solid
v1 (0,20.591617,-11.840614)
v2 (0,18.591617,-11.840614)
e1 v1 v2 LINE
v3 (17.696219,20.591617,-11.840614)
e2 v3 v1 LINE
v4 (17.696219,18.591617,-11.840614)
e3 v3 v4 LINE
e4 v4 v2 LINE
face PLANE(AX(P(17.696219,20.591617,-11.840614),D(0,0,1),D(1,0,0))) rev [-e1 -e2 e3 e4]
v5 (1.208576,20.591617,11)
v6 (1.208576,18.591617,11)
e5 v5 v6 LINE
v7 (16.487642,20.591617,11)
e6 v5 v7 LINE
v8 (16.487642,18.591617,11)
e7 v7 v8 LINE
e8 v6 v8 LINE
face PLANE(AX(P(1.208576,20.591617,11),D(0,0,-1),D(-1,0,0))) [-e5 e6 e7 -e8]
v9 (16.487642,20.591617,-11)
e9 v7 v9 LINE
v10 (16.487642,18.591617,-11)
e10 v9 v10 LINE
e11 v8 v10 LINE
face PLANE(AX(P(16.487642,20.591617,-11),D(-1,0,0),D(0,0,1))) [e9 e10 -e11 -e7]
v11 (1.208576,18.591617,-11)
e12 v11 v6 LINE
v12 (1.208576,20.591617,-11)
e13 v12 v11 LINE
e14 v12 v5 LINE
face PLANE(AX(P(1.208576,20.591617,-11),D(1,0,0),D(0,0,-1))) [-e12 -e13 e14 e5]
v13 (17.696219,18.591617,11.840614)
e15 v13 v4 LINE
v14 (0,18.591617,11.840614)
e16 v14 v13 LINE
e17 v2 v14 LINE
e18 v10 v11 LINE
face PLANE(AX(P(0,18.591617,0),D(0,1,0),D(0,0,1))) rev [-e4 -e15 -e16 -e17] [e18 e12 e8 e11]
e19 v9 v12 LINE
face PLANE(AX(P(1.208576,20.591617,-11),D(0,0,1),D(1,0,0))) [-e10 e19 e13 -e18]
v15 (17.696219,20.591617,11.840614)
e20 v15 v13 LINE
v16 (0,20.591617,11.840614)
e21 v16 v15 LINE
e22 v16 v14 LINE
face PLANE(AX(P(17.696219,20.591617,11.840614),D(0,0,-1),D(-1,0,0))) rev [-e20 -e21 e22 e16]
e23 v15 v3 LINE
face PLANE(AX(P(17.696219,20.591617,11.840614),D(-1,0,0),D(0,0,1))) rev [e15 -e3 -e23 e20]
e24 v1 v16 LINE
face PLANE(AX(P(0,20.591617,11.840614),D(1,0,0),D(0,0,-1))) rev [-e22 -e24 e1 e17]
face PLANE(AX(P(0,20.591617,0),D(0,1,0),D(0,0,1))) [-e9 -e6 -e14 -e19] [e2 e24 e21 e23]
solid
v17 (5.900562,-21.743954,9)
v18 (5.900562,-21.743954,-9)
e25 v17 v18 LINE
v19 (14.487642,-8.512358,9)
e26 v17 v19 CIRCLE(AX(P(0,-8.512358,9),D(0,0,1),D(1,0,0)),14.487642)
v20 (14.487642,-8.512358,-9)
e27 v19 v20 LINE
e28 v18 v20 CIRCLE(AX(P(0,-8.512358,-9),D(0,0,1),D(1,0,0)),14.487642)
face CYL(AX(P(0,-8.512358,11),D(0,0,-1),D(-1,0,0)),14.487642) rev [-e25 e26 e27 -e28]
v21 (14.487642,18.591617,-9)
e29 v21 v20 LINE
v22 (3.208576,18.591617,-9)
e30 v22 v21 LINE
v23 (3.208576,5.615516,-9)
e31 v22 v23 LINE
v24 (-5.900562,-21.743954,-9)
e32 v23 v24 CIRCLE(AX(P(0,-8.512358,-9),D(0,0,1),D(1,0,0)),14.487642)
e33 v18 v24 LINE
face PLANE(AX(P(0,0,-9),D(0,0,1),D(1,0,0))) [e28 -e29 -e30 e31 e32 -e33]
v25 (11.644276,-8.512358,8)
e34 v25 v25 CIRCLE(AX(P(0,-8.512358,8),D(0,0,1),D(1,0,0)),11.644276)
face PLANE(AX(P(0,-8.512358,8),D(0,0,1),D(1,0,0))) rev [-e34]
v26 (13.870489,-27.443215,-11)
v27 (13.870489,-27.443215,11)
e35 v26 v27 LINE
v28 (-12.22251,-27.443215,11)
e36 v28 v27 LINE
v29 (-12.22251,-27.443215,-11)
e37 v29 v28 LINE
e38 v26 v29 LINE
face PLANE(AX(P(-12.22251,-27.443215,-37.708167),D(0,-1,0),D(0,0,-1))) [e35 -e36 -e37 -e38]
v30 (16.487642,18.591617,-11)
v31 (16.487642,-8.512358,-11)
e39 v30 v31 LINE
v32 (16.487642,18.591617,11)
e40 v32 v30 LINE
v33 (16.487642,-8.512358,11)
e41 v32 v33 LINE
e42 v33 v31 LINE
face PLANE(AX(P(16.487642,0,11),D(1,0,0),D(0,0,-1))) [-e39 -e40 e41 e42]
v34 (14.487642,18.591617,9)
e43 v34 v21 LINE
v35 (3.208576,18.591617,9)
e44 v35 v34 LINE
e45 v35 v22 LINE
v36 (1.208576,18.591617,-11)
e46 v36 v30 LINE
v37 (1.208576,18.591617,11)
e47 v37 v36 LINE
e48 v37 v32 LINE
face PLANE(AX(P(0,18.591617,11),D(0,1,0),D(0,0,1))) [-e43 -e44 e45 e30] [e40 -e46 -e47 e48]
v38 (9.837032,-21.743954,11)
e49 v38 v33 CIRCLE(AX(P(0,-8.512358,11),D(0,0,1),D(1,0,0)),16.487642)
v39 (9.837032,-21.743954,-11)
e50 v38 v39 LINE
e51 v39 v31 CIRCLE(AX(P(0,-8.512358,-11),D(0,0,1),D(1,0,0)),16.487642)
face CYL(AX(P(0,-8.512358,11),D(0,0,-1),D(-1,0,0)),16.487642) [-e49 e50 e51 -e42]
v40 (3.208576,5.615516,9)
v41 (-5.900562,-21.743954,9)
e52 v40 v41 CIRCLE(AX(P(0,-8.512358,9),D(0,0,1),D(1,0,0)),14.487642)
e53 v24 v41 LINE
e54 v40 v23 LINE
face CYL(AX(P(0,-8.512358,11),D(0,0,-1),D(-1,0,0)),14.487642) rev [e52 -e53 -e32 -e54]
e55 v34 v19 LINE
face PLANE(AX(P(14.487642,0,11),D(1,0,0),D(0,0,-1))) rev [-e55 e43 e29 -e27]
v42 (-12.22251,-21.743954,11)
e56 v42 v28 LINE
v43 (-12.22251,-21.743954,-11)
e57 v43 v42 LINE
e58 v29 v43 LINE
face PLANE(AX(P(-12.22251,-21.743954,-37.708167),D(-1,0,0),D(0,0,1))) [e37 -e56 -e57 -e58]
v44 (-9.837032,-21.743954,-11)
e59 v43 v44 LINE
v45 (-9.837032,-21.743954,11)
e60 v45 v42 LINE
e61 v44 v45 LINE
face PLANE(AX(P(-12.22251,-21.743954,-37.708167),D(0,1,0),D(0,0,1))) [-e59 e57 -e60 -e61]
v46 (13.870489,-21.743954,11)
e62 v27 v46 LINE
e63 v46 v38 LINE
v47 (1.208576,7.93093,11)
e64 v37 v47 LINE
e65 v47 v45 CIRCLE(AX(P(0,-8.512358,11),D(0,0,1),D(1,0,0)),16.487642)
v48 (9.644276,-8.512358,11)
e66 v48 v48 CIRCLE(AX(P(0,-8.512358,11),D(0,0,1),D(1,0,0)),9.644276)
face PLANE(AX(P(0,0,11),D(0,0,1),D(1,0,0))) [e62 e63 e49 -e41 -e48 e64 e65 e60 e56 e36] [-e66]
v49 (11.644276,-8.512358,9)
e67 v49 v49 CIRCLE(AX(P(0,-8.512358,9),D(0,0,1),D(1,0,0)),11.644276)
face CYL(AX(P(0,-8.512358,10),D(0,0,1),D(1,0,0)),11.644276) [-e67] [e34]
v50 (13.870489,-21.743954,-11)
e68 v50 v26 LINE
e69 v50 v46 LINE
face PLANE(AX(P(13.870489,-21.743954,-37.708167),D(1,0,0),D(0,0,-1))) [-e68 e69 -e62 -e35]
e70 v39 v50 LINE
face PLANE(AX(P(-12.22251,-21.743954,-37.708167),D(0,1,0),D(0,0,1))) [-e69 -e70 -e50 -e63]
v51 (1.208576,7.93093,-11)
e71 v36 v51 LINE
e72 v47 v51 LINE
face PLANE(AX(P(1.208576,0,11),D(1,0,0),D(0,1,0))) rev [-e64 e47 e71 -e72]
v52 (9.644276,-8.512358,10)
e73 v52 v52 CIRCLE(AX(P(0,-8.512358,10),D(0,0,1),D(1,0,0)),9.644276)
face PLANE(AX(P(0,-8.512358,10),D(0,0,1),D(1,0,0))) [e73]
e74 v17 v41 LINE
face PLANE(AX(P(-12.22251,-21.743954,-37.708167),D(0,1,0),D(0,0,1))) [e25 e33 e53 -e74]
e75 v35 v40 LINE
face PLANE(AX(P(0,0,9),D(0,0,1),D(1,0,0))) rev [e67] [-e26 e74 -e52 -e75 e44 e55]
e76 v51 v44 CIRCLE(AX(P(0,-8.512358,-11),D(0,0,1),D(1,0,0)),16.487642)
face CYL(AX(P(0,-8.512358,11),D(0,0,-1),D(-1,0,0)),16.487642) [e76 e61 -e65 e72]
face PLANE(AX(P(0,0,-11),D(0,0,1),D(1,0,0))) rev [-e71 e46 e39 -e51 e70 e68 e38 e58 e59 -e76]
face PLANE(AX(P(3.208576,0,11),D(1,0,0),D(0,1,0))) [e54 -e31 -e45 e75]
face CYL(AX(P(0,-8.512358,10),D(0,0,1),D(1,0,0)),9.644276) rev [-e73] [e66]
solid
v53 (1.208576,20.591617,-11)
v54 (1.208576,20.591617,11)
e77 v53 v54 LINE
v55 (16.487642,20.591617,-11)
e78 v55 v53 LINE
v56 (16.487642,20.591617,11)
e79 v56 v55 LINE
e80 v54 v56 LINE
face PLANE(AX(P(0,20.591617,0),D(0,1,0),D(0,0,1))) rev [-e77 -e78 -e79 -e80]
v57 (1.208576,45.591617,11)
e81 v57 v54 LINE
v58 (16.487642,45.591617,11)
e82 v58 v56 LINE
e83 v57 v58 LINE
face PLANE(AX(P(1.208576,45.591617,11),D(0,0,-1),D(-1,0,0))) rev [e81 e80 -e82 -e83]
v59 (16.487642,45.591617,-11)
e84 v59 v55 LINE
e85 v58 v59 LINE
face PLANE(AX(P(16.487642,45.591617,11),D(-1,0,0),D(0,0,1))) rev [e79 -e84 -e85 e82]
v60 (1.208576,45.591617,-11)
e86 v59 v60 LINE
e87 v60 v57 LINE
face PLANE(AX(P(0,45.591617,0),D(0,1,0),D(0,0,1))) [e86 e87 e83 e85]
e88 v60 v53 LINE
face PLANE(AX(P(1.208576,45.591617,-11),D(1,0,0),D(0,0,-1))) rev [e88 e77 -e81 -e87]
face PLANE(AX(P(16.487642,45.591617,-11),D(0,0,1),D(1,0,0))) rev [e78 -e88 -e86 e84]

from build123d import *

# Parameters (mm, degrees)
BOSS_EXTRUDE1_DEPTH = 11
SKETCH2_R           = 9.644275983
CUT_EXTRUDE1_DEPTH  = 1
SHELL1_START        = -9
SHELL1_DEPTH        = 17
SHELL1_START_2      = 8
SHELL1_2_OUTLINE_R  = 11.644275983
SHELL1_2_DEPTH      = 1
BOSS_EXTRUDE2_REACH = 39.16
SKETCH3_W           = 26.092999246
SKETCH3_H           = 5.699260362
SKETCH4_W           = 17.696218594
SKETCH4_H           = 23.681228884
SKETCH4_W_2         = 15.279066264
SKETCH4_H_2         = 22
BOSS_EXTRUDE3_DEPTH = 2
SKETCH5_W           = 15.279066264
SKETCH5_H           = 22
BOSS_EXTRUDE4_DEPTH = 25


# Read off the part's stored shape, not the designer's step: Shell1
with BuildPart() as part:
    # Sketch1 → Boss-Extrude1 (new, symmetric)
    with BuildSketch(Plane.XY):
        with BuildLine():
            Line((1.208576165, 18.591616866), (1.208576165, 7.930929707))
            ThreePointArc((1.208576165, 7.930929707), (-12.078264042, -19.735453873), (16.487642429, -8.512357571))
            Line((16.487642429, -8.512357571), (16.487642429, 18.591616866))
            Line((16.487642429, 18.591616866), (1.208576165, 18.591616866))
        make_face()
    extrude(amount=BOSS_EXTRUDE1_DEPTH, both=True)

    # Sketch2 → Cut-Extrude1 (cut)
    with BuildSketch(Plane.XY.offset(11)):
        with Locations((0, -8.512357571)):
            Circle(SKETCH2_R)
    extrude(amount=-CUT_EXTRUDE1_DEPTH, mode=Mode.SUBTRACT)

    # Shell1 outline → Shell1 (cut)
    with BuildSketch(Plane.XY.offset(SHELL1_START)):
        with BuildLine():
            Line((3.208576165, 18.591616866), (3.208576165, 5.615516371))
            ThreePointArc((3.208576165, 5.615516371), (-11.322024715, -17.551358594), (14.487642429, -8.512357571))
            Line((14.487642429, -8.512357571), (14.487642429, 18.591616866))
            Line((14.487642429, 18.591616866), (3.208576165, 18.591616866))
        make_face()
    extrude(amount=SHELL1_DEPTH, mode=Mode.SUBTRACT)

    # Shell1 2 outline → Shell1 2 (cut)
    with BuildSketch(Plane.XY.offset(SHELL1_START_2)):
        with BuildLine():
            Line((3.208576165, 18.591616866), (3.208576165, 5.615516371))
            ThreePointArc((3.208576165, 5.615516371), (-11.322024715, -17.551358594), (14.487642429, -8.512357571))
            Line((14.487642429, -8.512357571), (14.487642429, 18.591616866))
            Line((14.487642429, 18.591616866), (3.208576165, 18.591616866))
        make_face()
        with Locations((0, -8.512357571)):
            Circle(SHELL1_2_OUTLINE_R, mode=Mode.SUBTRACT)
    extrude(amount=SHELL1_2_DEPTH, mode=Mode.SUBTRACT)

    # Boss-Extrude2: up to this face of the body (flat: up to its plane)
    boss_extrude2_end = Plane(part.part.faces().sort_by_distance((2.030831777, -4.5272693, -11))[0])
    # Sketch3 → Boss-Extrude2 (add, up to the picked face)
    with BuildSketch(Plane.XY.offset(11), mode=Mode.PRIVATE) as boss_extrude2_sk1:
        with Locations((0.82398945, -24.59358437)):
            Rectangle(SKETCH3_W, SKETCH3_H)
    boss_extrude2_tool1 = split(extrude(boss_extrude2_sk1.sketch, amount=-BOSS_EXTRUDE2_REACH, mode=Mode.PRIVATE), bisect_by=boss_extrude2_end, keep=Keep.BOTH, mode=Mode.PRIVATE)
    add(boss_extrude2_tool1.solids().sort_by(Axis((0.823989, -24.593584, 11), (0, 0, -1)))[0])


with BuildPart() as body_2:
    # Sketch4 → Boss-Extrude3 (new body)
    with BuildSketch(Plane(origin=(0, 18.591616866, 0), x_dir=(1, 0, 0), z_dir=(0, 1, 0))):
        with Locations((8.848109297, 0)):
            Rectangle(SKETCH4_W, SKETCH4_H)
        with Locations((8.848109297, 0)):
            Rectangle(SKETCH4_W_2, SKETCH4_H_2, mode=Mode.SUBTRACT)
    extrude(amount=BOSS_EXTRUDE3_DEPTH)


with BuildPart() as body_3:
    # Sketch5 → Boss-Extrude4 (new body)
    with BuildSketch(Plane(origin=(0, 20.591616866, 0), x_dir=(1, 0, 0), z_dir=(0, 1, 0))):
        with Locations((8.848109297, 0)):
            Rectangle(SKETCH5_W, SKETCH5_H)
    extrude(amount=BOSS_EXTRUDE4_DEPTH)


solid = Compound([part.part, body_2.part, body_3.part])
